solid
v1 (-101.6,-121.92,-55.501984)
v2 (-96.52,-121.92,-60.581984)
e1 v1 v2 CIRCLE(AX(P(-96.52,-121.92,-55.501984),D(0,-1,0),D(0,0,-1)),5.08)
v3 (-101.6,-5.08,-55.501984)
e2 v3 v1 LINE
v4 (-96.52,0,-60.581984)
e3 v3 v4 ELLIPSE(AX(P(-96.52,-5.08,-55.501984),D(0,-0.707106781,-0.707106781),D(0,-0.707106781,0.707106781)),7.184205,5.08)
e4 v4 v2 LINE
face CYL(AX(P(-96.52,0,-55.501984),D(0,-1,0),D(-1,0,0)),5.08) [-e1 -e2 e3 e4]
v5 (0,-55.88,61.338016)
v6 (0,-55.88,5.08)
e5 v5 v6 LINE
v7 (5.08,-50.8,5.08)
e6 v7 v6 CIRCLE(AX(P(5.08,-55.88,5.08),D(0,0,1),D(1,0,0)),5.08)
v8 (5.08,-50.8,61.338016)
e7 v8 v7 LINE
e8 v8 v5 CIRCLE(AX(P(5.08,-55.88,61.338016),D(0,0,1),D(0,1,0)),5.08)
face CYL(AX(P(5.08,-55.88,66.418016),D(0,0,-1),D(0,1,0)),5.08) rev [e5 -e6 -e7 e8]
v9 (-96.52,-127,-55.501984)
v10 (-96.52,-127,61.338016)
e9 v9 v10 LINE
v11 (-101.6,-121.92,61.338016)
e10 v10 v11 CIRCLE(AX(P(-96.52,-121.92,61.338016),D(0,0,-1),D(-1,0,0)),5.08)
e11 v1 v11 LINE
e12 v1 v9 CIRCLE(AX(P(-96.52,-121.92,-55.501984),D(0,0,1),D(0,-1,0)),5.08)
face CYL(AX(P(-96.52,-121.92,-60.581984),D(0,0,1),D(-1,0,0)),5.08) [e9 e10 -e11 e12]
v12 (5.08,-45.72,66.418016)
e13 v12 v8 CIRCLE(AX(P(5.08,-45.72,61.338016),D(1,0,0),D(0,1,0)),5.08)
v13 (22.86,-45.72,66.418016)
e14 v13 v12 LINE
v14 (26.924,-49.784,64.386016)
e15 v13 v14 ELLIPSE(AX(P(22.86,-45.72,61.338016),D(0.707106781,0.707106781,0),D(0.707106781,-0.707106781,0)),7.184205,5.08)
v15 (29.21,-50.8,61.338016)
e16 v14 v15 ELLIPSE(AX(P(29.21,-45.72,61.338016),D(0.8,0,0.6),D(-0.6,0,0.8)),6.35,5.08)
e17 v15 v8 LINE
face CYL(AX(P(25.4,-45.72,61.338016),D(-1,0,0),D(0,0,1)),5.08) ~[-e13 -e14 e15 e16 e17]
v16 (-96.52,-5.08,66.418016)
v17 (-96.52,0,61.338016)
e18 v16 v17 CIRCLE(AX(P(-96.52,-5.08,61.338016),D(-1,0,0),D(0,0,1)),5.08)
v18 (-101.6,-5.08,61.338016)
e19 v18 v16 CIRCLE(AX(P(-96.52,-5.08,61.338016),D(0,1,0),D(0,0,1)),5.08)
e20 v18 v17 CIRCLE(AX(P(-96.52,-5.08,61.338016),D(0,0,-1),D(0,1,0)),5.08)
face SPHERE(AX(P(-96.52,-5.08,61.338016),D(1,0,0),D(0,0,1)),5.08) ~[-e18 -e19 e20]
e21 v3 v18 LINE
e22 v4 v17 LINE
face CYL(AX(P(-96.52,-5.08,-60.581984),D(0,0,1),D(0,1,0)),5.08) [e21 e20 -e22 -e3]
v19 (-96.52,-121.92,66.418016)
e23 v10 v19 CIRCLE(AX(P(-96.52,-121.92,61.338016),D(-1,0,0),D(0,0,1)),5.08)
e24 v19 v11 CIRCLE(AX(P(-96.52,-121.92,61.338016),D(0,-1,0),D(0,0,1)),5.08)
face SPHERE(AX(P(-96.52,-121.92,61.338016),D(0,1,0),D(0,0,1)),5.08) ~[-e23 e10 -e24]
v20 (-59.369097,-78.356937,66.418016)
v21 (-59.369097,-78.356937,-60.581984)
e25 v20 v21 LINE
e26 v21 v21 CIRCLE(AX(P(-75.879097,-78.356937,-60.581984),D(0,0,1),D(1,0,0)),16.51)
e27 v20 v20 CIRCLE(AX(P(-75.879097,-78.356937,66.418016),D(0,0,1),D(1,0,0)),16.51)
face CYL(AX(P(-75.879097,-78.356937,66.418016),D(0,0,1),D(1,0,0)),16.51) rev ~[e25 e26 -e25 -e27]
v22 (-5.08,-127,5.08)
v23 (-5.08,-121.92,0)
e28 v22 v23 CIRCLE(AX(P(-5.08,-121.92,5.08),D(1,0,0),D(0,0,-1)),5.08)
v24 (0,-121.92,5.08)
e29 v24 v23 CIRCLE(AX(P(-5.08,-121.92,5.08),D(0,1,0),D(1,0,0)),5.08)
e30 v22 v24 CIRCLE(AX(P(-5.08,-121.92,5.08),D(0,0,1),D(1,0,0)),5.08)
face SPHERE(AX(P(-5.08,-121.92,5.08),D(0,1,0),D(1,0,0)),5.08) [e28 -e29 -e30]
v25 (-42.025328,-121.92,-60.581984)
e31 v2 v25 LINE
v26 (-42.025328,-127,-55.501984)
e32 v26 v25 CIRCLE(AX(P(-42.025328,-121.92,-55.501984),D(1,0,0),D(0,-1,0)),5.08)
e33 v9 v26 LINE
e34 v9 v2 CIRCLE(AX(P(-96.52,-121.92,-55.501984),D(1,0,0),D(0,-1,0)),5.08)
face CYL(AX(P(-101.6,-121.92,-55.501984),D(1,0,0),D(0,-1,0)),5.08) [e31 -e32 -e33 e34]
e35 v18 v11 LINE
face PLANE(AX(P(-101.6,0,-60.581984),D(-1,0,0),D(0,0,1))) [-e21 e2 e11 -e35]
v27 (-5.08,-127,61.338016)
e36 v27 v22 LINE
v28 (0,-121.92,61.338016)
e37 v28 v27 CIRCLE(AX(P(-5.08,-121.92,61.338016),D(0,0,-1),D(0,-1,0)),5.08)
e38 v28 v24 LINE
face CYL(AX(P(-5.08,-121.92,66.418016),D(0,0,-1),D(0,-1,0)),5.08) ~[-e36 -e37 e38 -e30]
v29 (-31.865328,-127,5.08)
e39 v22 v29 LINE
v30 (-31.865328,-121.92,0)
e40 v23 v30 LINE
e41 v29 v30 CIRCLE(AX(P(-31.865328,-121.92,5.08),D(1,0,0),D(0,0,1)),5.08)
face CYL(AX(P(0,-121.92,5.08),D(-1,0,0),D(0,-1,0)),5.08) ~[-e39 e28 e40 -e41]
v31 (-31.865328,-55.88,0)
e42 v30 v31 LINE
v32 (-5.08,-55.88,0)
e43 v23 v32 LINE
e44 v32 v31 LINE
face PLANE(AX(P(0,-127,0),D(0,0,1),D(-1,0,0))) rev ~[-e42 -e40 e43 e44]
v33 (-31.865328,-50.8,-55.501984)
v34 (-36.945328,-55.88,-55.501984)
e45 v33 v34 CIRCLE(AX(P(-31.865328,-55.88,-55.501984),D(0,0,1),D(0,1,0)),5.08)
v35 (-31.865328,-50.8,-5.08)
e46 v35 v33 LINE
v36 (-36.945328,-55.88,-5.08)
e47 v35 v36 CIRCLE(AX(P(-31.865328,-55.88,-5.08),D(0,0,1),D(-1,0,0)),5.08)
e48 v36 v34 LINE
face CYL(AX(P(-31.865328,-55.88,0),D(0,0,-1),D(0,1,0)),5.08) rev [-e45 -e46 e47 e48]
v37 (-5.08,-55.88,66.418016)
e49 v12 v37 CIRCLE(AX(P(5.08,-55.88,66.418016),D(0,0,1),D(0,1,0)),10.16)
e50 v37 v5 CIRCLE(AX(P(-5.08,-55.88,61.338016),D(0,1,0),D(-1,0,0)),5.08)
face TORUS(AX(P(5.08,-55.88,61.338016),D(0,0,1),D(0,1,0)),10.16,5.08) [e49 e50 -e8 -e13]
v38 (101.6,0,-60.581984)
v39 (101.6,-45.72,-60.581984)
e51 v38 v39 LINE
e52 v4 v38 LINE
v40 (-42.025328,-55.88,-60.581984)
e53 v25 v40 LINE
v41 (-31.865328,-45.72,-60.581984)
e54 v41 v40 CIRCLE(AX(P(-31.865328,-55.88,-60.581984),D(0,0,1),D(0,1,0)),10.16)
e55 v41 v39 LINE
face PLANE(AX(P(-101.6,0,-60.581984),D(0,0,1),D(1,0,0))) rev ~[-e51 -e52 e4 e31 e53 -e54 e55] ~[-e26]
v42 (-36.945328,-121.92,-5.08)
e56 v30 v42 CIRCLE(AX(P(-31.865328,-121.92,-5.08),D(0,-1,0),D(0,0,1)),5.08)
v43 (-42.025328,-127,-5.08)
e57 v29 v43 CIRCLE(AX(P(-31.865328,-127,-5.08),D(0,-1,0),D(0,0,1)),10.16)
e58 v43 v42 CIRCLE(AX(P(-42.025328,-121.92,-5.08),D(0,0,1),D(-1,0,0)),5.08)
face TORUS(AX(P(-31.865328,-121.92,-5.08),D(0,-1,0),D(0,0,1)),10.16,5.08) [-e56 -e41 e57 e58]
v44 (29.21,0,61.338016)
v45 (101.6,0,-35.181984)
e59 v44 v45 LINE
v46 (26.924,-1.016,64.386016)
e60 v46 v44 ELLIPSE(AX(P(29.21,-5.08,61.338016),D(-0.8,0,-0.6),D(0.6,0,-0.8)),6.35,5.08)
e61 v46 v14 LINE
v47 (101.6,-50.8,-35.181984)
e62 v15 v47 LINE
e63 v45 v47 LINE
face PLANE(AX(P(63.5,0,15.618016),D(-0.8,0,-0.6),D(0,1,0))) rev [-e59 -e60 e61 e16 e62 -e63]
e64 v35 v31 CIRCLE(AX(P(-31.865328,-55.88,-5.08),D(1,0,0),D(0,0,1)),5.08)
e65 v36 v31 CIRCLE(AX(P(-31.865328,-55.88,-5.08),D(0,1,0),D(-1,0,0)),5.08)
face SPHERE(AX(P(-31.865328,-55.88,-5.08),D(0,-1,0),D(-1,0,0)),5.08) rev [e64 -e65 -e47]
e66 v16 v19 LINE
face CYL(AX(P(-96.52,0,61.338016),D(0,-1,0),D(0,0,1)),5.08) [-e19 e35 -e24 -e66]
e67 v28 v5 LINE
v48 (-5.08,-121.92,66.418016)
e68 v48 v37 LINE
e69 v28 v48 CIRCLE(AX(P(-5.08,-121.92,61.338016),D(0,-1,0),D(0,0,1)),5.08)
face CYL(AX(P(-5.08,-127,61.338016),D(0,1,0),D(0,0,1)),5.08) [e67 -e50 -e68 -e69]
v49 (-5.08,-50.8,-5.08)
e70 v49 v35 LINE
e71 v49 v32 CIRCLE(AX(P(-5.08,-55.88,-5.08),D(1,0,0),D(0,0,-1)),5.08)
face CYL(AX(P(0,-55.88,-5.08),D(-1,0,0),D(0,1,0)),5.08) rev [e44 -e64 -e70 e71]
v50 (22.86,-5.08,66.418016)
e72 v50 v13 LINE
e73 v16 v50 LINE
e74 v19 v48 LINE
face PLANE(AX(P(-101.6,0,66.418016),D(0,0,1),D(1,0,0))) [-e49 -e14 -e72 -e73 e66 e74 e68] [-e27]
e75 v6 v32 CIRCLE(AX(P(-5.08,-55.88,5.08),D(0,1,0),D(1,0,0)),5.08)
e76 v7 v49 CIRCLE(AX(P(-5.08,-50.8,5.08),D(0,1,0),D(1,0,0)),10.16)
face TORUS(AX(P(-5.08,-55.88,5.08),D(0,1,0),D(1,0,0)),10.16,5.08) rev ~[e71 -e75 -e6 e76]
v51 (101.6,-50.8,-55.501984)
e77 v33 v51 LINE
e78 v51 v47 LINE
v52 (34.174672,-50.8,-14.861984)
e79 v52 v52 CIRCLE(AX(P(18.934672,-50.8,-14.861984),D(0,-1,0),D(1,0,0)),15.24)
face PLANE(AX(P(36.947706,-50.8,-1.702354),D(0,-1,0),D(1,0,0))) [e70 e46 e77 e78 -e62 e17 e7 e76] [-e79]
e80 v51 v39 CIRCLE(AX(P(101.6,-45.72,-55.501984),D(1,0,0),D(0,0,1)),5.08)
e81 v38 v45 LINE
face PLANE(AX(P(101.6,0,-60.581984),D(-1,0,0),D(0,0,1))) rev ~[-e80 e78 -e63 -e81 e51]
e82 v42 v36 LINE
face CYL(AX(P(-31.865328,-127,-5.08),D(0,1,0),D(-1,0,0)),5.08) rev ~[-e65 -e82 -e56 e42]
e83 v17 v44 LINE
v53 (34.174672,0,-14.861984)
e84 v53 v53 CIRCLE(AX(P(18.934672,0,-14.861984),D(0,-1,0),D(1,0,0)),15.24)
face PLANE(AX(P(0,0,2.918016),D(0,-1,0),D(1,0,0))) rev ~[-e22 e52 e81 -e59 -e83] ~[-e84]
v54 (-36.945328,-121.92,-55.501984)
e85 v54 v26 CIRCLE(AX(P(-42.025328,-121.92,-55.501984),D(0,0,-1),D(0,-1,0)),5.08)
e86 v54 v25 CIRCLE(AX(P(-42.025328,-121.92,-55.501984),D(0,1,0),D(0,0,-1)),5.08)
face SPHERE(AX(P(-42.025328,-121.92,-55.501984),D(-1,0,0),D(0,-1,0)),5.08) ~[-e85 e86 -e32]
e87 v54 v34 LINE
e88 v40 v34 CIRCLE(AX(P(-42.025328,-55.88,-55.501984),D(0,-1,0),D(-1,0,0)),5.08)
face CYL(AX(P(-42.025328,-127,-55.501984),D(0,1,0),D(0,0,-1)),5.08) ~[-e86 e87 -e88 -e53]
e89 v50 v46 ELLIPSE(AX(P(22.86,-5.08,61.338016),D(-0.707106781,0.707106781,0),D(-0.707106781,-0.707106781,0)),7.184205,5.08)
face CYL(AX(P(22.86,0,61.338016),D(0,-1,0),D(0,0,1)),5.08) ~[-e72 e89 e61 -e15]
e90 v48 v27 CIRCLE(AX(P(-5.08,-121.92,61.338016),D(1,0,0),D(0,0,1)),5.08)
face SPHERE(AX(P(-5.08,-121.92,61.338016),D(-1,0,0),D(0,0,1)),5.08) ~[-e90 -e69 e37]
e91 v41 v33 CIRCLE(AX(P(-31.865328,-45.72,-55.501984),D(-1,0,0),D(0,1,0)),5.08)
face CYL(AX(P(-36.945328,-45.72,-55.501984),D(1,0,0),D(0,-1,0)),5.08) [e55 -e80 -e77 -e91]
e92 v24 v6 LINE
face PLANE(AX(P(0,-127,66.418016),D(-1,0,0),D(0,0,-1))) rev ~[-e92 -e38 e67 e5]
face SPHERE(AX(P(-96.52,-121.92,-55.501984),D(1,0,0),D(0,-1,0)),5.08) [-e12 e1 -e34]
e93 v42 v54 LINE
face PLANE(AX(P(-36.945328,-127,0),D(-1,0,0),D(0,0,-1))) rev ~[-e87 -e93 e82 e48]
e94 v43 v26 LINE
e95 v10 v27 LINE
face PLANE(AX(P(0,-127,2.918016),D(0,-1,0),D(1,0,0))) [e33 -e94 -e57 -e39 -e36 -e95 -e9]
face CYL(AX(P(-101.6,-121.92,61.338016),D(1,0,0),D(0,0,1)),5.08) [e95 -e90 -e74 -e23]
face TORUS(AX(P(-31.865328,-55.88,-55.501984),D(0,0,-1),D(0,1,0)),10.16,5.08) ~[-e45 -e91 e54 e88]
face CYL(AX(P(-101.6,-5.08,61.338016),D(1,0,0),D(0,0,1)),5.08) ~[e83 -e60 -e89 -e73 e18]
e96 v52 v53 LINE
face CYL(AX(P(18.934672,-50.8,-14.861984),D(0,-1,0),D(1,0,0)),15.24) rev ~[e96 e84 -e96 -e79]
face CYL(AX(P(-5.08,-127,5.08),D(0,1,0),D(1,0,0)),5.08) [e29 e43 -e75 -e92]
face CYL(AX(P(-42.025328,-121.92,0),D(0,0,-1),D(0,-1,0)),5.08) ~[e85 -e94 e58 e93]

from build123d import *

# Parameters (mm, degrees)
F0_W     = 203.2
F0_H     = 127
F1_DEPTH = 127
F3_DEPTH = 76.2
F4_SIZE2 = 101.6
F4_SIZE  = 76.2
F5_R     = 5.08
F6_R     = 15.24
F7_DEPTH = 50.8
F8_R     = 16.51
F9_DEPTH = 127


with BuildPart() as f1:
    # F0 (on Front) → F1 (new body)
    with BuildSketch(Plane.XZ):
        with Locations((0, 2.9180156587)):
            Rectangle(F0_W, F0_H)
    extrude(amount=F1_DEPTH)

    # F2 (on face) → F3 (cut)
    with BuildSketch(Plane.XZ.offset(127)):
        Polygon((-36.9453281164, 0), (-36.9453281164, -60.5819843413), (101.6, -60.5819843413), (101.6, 66.4180156587), (0, 66.4180156587), (0, 0), align=None)
    extrude(amount=-F3_DEPTH, mode=Mode.SUBTRACT)

    # F4
    f4_edges = [f1.edges().sort_by_distance(p)[0] for p in [
        (101.6, -25.4, 66.418016),
    ]]
    f4_side = f1.faces().sort_by_distance((-21.771429, -52.614286, 66.418016))[0]
    chamfer(f4_edges, length=F4_SIZE, length2=F4_SIZE2, reference=f4_side)

    # F5
    f5_edges = [f1.edges().sort_by_distance(p)[0] for p in [
        (-38.1, 0, 66.418016),
        (25.4, -25.4, 66.418016),
        (-101.6, -63.5, 66.418016),
        (12.7, -50.8, 66.418016),
        (-50.8, -127, 66.418016),
        (0, -88.9, 66.418016),
        (0, -88.9, 0),
        (0, -127, 33.209008),
        (0, -50.8, 33.209008),
        (-69.272664, -127, -60.581984),
        (-101.6, -127, 2.918016),
        (-18.472664, -127, 0),
        (-36.945328, -127, -30.290992),
        (-36.945328, -88.9, 0),
        (-36.945328, -88.9, -60.581984),
        (-36.945328, -50.8, -30.290992),
        (-101.6, -63.5, -60.581984),
        (-101.6, 0, 2.918016),
        (32.327336, -50.8, -60.581984),
        (-18.472664, -50.8, 0),
    ]]
    fillet(f5_edges, radius=F5_R)

    # F6 (on face) → F7 (cut, through all)
    with BuildSketch(Plane.XZ.offset(50.8)):
        with Locations((18.9346718836, -14.8619843413)):
            Circle(F6_R)
    extrude(amount=-F7_DEPTH, mode=Mode.SUBTRACT)

    # F8 (on face) → F9 (cut, through all)
    with BuildSketch(Plane.XY.offset(66.4180156587)):
        with Locations((-75.8790969849, -78.356936574)):
            Circle(F8_R)
    extrude(amount=-F9_DEPTH, mode=Mode.SUBTRACT)


solid = f1.part
